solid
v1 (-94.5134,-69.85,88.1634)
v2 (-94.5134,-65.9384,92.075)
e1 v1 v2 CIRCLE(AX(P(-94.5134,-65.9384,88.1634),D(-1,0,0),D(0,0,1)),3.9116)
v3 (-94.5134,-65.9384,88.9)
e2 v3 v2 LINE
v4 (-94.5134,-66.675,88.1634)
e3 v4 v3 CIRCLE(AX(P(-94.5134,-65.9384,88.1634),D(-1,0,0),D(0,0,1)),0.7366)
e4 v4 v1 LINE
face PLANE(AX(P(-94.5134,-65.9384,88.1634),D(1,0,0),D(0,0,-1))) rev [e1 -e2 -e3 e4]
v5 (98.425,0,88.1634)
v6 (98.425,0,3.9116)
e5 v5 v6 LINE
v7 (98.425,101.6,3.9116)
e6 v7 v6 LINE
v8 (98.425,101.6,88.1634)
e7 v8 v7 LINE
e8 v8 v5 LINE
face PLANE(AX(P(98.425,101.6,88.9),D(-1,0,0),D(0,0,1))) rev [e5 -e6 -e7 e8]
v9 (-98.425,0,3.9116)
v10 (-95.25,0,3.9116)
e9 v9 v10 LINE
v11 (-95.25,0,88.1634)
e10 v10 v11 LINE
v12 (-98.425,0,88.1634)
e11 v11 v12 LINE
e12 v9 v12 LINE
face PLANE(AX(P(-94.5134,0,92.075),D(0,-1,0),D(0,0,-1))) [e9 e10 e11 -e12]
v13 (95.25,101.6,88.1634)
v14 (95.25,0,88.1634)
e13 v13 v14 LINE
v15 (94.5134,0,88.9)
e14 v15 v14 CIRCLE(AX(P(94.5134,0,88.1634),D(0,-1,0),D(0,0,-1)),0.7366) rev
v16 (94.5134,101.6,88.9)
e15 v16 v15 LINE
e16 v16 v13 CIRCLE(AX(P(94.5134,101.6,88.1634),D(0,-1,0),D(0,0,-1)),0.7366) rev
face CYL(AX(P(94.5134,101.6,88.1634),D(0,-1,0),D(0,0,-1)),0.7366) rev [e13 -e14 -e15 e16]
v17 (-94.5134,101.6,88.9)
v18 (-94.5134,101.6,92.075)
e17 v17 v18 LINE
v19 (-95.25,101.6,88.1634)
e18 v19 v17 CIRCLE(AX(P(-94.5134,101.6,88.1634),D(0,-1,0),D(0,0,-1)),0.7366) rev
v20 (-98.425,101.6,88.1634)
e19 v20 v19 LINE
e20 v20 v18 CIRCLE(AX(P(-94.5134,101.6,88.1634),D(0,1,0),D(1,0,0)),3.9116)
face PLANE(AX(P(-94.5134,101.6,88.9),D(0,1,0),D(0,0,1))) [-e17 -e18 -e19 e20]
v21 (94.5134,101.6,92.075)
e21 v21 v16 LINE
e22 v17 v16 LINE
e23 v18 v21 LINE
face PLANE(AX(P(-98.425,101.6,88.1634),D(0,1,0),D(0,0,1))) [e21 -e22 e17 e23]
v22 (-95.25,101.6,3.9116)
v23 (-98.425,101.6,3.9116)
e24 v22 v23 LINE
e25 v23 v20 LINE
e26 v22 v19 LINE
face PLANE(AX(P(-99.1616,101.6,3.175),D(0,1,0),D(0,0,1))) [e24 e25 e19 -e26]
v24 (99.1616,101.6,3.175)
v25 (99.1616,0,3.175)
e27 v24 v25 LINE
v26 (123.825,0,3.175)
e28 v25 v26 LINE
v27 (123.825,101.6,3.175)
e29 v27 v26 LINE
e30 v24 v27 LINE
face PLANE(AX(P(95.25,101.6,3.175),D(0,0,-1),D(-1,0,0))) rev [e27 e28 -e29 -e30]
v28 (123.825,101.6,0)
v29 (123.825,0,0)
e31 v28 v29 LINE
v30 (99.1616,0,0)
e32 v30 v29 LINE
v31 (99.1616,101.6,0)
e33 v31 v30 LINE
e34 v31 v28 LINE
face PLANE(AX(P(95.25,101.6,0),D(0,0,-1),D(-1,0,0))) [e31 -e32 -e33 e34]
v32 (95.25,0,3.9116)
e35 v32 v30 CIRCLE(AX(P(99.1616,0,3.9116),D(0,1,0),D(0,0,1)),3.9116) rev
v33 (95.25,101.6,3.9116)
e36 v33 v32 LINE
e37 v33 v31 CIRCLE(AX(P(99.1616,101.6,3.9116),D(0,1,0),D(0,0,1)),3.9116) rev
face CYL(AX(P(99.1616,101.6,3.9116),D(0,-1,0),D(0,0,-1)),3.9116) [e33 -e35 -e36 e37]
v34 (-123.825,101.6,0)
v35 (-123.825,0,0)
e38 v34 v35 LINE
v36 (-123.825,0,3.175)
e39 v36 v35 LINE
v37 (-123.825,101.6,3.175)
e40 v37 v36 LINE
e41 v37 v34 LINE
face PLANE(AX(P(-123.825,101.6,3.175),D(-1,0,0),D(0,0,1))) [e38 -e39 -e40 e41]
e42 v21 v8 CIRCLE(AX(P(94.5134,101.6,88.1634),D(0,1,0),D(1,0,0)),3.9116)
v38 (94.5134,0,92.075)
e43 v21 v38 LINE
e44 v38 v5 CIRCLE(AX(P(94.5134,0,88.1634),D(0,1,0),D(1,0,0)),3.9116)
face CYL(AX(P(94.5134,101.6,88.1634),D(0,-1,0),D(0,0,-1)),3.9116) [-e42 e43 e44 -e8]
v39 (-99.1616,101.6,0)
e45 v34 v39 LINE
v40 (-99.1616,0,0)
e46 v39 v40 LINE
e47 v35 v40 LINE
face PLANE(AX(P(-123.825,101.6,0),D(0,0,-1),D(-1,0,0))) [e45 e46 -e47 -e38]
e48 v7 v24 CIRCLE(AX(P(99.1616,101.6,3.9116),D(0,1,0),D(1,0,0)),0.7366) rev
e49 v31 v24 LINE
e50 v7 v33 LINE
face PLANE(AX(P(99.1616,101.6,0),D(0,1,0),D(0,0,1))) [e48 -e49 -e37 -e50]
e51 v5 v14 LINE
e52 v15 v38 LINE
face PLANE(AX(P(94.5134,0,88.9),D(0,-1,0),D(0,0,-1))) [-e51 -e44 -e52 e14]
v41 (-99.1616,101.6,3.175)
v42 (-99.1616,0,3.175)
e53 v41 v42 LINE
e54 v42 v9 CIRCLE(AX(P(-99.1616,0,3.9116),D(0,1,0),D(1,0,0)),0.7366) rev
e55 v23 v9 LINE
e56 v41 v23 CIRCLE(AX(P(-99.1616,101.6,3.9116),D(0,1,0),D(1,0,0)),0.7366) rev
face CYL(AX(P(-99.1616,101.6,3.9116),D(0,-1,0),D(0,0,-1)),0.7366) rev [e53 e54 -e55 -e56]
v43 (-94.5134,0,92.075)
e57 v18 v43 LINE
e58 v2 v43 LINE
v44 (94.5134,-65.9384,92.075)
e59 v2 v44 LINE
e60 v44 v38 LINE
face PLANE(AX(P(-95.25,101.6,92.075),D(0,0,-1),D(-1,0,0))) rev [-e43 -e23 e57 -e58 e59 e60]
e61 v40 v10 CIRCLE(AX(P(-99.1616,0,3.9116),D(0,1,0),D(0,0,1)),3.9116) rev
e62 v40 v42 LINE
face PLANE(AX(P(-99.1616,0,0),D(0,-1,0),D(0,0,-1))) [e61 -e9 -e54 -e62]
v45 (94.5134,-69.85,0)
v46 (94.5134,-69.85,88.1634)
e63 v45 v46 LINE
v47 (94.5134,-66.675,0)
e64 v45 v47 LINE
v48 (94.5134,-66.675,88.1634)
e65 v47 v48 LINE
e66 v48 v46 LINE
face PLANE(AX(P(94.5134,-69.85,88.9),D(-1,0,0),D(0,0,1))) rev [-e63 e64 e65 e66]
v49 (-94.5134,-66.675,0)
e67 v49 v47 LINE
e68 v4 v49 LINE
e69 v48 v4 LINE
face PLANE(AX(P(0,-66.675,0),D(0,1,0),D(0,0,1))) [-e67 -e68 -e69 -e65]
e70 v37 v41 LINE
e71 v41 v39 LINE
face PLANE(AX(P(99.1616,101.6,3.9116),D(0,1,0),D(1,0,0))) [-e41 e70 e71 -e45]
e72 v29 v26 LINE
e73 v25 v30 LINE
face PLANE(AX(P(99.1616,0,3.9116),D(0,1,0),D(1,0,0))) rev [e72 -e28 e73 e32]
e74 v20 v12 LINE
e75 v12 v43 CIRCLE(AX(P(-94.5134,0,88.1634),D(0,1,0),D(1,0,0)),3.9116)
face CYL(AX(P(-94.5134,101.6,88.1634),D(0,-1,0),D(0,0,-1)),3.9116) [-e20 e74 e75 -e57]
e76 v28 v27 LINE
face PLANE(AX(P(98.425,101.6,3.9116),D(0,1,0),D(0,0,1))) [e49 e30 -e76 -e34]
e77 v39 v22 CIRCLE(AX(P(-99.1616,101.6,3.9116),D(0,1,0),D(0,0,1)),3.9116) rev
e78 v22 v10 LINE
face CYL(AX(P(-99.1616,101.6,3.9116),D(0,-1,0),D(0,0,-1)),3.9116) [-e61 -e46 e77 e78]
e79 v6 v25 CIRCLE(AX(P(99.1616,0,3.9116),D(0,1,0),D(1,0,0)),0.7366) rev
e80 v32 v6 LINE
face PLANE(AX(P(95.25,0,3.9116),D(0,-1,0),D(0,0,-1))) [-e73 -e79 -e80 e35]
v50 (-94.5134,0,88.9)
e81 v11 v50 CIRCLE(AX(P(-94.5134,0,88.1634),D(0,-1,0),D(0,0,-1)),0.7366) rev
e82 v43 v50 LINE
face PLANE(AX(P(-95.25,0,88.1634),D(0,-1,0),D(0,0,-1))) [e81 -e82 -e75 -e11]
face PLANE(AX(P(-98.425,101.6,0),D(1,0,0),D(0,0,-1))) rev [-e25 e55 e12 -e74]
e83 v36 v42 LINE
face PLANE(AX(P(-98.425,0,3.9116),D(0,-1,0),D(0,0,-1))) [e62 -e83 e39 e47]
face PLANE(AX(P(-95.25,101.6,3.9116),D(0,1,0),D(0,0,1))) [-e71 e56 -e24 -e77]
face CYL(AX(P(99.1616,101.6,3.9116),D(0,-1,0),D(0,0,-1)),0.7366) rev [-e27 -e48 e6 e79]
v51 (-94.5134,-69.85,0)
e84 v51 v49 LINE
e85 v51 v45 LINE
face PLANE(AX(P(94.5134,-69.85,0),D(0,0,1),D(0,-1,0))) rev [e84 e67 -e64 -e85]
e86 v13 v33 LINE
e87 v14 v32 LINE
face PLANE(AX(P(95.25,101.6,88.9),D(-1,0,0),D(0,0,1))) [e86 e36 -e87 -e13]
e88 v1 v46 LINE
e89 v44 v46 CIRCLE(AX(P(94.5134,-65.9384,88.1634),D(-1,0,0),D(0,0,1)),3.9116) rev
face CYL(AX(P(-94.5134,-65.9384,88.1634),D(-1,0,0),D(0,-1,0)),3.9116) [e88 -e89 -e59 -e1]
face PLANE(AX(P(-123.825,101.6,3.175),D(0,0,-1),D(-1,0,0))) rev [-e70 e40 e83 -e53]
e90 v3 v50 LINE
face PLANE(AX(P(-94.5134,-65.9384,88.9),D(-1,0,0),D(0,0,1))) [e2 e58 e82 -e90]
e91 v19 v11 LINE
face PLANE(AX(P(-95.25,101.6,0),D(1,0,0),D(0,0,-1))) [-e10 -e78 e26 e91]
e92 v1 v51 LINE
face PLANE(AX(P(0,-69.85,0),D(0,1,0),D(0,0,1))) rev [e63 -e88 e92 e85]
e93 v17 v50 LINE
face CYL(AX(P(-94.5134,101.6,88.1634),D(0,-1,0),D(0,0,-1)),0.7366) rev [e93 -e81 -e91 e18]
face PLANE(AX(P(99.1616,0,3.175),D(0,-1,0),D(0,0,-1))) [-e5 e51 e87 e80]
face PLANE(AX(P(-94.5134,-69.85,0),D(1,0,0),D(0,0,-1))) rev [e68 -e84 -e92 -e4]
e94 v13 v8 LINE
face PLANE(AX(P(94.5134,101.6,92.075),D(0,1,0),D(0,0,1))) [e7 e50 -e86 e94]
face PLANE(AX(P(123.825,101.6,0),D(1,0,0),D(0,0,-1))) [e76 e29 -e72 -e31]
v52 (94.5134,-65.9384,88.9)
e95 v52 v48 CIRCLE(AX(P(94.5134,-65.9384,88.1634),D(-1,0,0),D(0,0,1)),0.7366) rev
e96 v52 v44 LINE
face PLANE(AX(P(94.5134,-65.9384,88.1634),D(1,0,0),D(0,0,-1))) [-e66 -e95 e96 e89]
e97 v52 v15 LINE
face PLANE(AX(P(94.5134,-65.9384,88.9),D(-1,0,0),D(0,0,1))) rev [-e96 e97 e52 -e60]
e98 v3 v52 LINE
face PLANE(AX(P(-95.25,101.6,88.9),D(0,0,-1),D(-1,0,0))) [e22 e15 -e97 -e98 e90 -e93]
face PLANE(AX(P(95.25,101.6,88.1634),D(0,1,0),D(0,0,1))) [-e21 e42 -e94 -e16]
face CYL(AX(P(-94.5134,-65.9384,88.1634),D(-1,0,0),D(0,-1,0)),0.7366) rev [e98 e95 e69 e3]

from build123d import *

# Parameters (mm, degrees)
BASE_FLANGE1_DEPTH = 101.6
EDGE_FLANGE1_START = -94.5134
EDGE_FLANGE1_DEPTH = 189.0268


# Read off the part's stored shape, not the designer's step: Edge-Flange1
# Sheet-metal steps are written as plain solids
with BuildPart() as part:
    # Sketch1 → Base-Flange1 (new body)
    with BuildSketch(Plane(origin=(0, 0, 0), x_dir=(1, 0, 0), z_dir=(0, 1, 0))):
        with BuildLine():
            Line((-123.825, 0), (-99.1616, 0))
            ThreePointArc((-99.1616, 0), (-96.395681115, -1.145681115), (-95.25, -3.9116))
            Line((-95.25, -3.9116), (-95.25, -88.1634))
            ThreePointArc((-95.25, -88.1634), (-95.034254855, -88.684254855), (-94.5134, -88.9))
            Line((-94.5134, -88.9), (94.5134, -88.9))
            ThreePointArc((94.5134, -88.9), (95.034254855, -88.684254855), (95.25, -88.1634))
            Line((95.25, -88.1634), (95.25, -3.9116))
            ThreePointArc((95.25, -3.9116), (96.395681115, -1.145681115), (99.1616, 0))
            Line((99.1616, 0), (123.825, 0))
            Line((123.825, 0), (123.825, -3.175))
            Line((123.825, -3.175), (99.1616, -3.175))
            ThreePointArc((99.1616, -3.175), (98.640745145, -3.390745145), (98.425, -3.9116))
            Line((98.425, -3.9116), (98.425, -88.1634))
            ThreePointArc((98.425, -88.1634), (97.279318885, -90.929318885), (94.5134, -92.075))
            Line((94.5134, -92.075), (-94.5134, -92.075))
            ThreePointArc((-94.5134, -92.075), (-97.279318885, -90.929318885), (-98.425, -88.1634))
            Line((-98.425, -88.1634), (-98.425, -3.9116))
            ThreePointArc((-98.425, -3.9116), (-98.640745145, -3.390745145), (-99.1616, -3.175))
            Line((-99.1616, -3.175), (-123.825, -3.175))
            Line((-123.825, -3.175), (-123.825, 0))
        make_face()
    extrude(amount=BASE_FLANGE1_DEPTH)

    # Edge-Flange1 outline → Edge-Flange1 (add)
    with BuildSketch(Plane.YZ.offset(EDGE_FLANGE1_START)):
        with BuildLine():
            Line((-69.85, 0), (-66.675, 0))
            Line((-66.675, 0), (-66.675, 88.1634))
            ThreePointArc((-66.675, 88.1634), (-66.459254855, 88.684254855), (-65.9384, 88.9))
            Line((-65.9384, 88.9), (0, 88.9))
            Line((0, 88.9), (0, 92.075))
            Line((0, 92.075), (-65.9384, 92.075))
            ThreePointArc((-65.9384, 92.075), (-68.704318885, 90.929318885), (-69.85, 88.1634))
            Line((-69.85, 88.1634), (-69.85, 0))
        make_face()
    extrude(amount=EDGE_FLANGE1_DEPTH)


solid = part.part
